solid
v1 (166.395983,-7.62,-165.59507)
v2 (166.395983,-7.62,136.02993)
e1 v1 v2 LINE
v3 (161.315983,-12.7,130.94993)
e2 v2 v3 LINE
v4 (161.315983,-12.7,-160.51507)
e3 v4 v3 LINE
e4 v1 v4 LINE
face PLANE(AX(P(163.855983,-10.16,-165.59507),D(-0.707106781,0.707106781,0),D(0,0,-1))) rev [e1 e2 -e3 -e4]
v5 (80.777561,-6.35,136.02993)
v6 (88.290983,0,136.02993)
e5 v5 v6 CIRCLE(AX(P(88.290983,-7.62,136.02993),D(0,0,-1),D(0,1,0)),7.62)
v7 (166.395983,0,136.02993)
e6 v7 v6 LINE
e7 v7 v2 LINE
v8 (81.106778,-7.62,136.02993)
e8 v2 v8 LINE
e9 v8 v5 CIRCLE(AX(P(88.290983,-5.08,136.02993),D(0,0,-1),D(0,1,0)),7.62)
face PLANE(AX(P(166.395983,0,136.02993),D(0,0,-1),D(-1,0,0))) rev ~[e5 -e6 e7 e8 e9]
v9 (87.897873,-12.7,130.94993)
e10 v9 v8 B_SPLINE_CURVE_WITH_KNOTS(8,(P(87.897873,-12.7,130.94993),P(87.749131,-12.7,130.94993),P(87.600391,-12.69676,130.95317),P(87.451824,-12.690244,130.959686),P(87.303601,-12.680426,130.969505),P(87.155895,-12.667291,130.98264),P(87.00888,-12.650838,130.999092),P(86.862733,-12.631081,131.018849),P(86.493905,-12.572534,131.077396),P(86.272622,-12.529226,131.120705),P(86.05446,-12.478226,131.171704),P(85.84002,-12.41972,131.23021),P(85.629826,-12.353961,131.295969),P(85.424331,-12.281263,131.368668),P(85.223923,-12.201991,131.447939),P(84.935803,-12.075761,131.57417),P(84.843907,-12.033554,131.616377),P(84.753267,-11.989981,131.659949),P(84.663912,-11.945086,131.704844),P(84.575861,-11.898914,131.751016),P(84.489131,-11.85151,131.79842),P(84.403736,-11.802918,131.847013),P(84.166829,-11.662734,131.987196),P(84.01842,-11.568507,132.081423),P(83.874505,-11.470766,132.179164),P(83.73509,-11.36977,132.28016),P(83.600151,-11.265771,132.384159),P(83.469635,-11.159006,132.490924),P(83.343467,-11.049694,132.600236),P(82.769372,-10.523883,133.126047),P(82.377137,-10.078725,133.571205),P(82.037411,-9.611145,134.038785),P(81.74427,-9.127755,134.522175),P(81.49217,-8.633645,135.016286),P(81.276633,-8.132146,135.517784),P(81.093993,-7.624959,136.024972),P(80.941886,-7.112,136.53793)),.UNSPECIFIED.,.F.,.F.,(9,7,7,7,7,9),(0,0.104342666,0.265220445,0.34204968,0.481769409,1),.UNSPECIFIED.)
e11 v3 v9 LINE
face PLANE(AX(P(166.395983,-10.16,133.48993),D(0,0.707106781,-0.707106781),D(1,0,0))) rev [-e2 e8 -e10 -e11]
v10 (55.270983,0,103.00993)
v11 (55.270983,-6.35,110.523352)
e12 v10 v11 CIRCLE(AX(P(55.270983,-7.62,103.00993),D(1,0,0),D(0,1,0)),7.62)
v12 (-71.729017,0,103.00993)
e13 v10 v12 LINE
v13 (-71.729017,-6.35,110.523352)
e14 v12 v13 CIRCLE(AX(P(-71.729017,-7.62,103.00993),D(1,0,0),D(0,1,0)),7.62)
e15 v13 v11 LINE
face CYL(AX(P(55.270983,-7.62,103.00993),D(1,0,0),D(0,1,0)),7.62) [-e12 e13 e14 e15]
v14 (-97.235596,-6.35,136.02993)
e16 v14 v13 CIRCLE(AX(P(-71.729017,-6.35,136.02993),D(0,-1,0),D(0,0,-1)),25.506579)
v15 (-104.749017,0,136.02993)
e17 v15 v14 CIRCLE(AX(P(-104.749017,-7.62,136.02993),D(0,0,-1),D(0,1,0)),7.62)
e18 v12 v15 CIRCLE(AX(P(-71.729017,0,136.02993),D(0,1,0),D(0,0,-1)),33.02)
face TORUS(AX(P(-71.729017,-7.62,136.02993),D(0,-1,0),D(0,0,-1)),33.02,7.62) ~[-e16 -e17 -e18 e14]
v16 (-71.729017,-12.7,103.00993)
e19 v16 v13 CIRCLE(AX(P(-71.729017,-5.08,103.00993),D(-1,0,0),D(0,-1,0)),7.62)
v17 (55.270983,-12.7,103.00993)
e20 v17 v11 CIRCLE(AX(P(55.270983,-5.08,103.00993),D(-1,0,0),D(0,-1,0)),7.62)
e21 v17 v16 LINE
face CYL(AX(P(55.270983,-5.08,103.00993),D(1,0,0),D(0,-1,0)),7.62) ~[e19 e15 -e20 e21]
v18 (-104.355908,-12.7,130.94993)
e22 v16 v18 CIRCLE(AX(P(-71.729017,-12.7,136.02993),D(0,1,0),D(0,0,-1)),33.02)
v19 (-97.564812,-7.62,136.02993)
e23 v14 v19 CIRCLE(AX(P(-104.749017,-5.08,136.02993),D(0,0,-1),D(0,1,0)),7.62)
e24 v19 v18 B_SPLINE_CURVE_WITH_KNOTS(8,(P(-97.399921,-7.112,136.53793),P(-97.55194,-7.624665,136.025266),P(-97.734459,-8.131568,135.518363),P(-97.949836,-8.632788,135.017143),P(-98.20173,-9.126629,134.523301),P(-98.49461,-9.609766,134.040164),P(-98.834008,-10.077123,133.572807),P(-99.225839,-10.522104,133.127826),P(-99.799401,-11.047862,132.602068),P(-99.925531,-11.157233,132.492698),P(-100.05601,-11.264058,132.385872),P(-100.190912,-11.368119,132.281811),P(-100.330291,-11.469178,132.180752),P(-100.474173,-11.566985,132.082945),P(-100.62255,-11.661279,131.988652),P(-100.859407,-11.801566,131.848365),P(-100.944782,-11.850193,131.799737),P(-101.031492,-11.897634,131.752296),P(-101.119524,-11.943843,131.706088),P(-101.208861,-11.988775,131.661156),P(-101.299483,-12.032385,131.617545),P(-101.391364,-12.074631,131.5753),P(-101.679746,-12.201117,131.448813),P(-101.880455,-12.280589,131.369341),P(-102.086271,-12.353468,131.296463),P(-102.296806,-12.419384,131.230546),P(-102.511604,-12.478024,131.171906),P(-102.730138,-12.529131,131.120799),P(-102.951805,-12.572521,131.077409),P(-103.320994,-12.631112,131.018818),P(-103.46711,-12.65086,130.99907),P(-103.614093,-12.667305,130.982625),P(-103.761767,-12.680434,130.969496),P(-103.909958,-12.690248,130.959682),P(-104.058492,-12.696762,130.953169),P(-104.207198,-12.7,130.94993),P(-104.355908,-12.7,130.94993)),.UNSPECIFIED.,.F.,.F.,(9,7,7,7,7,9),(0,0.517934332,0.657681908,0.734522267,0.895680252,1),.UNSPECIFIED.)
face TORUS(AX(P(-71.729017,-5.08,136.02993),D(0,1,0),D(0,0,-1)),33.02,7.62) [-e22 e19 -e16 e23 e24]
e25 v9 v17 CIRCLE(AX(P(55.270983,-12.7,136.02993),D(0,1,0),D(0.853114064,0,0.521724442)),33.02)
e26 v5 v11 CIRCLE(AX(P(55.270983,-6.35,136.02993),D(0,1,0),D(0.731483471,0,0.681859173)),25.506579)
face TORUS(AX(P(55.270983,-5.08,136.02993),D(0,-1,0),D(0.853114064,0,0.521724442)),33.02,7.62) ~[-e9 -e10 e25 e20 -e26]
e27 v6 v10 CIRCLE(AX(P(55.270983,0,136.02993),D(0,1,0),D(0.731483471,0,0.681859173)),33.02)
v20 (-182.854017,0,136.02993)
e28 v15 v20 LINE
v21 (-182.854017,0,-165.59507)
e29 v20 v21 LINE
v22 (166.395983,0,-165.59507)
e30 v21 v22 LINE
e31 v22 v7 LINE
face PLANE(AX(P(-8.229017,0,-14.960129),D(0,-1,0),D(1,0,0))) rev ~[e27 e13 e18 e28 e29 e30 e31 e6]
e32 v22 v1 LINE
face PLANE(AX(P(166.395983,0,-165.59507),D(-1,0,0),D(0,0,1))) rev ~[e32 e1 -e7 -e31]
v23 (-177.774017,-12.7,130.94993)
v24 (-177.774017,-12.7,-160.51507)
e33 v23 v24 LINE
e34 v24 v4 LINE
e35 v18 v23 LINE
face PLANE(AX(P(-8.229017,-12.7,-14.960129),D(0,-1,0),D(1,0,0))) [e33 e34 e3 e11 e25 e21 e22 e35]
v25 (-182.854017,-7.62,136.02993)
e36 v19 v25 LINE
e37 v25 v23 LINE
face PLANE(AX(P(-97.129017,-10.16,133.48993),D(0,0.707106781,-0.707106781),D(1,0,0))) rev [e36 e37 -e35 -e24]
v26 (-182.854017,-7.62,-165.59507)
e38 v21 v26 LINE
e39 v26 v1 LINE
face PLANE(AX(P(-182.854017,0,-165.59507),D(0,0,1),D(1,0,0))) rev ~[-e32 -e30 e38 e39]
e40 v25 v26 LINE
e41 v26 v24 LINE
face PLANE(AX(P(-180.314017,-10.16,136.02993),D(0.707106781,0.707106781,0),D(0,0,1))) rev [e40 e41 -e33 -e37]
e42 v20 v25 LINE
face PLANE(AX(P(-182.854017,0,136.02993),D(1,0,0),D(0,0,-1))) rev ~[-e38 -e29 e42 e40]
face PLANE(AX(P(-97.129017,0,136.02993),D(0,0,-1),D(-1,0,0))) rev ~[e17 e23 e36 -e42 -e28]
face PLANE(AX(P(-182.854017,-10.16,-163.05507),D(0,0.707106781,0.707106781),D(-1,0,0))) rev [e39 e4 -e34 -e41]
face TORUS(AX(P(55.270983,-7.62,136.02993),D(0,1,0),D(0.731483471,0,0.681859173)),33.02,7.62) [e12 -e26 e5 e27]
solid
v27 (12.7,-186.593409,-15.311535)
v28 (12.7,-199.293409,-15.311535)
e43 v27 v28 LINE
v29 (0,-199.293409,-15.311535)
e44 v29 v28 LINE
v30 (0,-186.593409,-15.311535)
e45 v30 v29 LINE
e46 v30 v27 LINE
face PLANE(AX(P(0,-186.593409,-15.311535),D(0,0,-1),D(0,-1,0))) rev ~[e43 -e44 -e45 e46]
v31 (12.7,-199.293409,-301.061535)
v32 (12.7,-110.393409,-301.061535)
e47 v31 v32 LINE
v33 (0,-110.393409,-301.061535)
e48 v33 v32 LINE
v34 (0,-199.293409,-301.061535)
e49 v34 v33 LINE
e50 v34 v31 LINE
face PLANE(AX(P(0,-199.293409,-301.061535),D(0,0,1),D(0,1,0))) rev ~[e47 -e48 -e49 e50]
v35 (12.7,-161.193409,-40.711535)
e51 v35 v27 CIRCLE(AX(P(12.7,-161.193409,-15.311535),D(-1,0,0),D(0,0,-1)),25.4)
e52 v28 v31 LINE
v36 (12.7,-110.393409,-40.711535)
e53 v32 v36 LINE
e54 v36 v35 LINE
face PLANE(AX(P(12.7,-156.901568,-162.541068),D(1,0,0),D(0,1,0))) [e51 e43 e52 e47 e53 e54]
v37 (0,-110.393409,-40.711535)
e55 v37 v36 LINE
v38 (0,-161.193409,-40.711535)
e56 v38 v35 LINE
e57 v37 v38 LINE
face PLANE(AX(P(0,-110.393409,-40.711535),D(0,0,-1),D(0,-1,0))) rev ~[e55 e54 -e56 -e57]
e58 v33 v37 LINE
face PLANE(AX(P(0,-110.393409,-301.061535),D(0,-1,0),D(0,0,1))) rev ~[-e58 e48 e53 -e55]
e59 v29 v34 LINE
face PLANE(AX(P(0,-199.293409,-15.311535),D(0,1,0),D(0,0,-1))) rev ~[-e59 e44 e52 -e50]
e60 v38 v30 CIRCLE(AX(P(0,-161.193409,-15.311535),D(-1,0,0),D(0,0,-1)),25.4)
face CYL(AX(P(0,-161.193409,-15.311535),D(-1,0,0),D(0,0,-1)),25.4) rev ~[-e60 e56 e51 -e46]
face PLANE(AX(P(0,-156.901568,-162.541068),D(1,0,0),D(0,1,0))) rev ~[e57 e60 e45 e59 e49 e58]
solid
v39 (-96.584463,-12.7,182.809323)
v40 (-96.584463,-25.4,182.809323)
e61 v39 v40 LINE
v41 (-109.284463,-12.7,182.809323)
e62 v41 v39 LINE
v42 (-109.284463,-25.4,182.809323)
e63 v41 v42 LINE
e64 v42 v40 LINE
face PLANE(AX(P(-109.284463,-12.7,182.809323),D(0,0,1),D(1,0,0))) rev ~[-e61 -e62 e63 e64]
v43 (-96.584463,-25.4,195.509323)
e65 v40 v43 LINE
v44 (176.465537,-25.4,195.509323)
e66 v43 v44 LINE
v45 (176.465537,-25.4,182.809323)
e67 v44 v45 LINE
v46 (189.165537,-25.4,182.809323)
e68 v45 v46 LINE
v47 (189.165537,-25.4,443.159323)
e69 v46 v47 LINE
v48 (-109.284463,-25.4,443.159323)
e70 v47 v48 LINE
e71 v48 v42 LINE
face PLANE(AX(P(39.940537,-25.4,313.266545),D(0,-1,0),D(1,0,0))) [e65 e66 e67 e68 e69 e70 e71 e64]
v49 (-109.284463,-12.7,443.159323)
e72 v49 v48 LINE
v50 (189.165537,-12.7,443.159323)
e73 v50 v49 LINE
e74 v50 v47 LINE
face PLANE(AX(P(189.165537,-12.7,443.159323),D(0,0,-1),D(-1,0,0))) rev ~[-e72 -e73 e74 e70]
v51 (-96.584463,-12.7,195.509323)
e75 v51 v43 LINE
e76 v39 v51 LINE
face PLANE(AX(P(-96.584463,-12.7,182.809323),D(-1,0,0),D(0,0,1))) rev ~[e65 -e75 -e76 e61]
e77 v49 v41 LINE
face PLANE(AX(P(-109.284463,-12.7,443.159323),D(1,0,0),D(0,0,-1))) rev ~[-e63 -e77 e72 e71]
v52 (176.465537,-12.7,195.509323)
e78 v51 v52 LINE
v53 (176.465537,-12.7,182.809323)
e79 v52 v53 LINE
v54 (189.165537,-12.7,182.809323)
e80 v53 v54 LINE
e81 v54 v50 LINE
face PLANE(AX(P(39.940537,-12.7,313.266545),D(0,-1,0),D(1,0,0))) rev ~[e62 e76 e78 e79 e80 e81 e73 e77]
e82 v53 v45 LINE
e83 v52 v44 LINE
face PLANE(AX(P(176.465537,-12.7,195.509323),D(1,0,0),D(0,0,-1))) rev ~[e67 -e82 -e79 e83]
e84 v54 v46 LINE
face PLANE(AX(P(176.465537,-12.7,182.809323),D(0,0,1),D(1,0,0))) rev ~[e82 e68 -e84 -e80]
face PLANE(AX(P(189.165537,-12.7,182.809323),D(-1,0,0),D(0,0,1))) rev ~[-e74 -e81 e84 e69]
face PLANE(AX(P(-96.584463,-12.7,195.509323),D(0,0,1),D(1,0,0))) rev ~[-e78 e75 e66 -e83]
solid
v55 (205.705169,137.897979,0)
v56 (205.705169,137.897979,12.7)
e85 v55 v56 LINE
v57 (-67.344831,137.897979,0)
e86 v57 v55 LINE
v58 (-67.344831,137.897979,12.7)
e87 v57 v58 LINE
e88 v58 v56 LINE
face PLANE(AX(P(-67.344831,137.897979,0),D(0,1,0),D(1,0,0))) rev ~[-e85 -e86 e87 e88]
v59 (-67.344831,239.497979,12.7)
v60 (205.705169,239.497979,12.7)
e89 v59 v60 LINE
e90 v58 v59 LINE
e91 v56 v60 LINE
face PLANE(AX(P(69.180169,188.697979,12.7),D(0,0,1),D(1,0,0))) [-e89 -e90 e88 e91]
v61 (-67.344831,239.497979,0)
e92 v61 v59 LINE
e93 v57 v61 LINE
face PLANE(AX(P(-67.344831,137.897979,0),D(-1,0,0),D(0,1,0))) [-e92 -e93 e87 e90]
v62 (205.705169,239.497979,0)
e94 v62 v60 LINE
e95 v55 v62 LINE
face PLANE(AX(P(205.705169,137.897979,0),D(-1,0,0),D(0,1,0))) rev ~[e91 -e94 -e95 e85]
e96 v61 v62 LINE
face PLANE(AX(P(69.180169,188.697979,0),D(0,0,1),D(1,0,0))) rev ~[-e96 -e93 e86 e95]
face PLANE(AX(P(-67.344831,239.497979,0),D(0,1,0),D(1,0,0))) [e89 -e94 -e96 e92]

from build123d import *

# Parameters (mm, degrees)
F1_DEPTH     = 12.7
F2_SIZE      = 5.08
F3_T3_DEPTH  = 127
F3_T6_DEPTH  = 127
F3_T9_ANGLE  = 132.9890967712
F3_T12_ANGLE = 132.9890967712
F3_T15_ANGLE = 121.447994897
F3_T18_ANGLE = 121.447994897
F4_W         = 273.05
F4_H         = 101.6
F5_DEPTH     = 12.7
F7_DEPTH     = 12.7
F9_DEPTH     = 12.7


# Not quite as in the source:
# - a fillet or chamfer that OpenCascade refuses, or shapes differently, is made with other operations: its cross-section is extruded or revolved along the edge and cut away or added


with BuildPart() as f1:
    # F0 (on Front) → F1 (new body)
    with BuildSketch(Plane.XZ):
        with BuildLine():
            Line((-97.1290172577, 136.0299303359), (-182.8540172577, 136.0299303359))
            Line((-182.8540172577, 136.0299303359), (-182.8540172577, -165.5950696641))
            Line((-182.8540172577, -165.5950696641), (166.3959827423, -165.5950696641))
            Line((166.3959827423, -165.5950696641), (166.3959827423, 136.0299303359))
            Line((166.3959827423, 136.0299303359), (80.6709827423, 136.0299303359))
            ThreePointArc((80.6709827423, 136.0299303359), (73.2314949844, 118.0694180937), (55.2709827423, 110.6299303359))
            Line((55.2709827423, 110.6299303359), (-71.7290172577, 110.6299303359))
            ThreePointArc((-71.7290172577, 110.6299303359), (-89.6895294998, 118.0694180937), (-97.1290172577, 136.0299303359))
        make_face()
    extrude(amount=F1_DEPTH)

    # F2
    f2_edges = [f1.edges().sort_by_distance(p)[0] for p in [
        (-8.229017, -12.7, -165.59507),
        (166.395983, -12.7, -14.78257),
        (-182.854017, -12.7, -14.78257),
        (-139.991517, -12.7, 136.02993),
        (123.533483, -12.7, 136.02993),
    ]]
    chamfer(f2_edges, length=F2_SIZE)

    # F3: fillet of radius 7.62 on 2 edges, made by hand


with BuildPart() as f3_tool1:
    # F3_s2 → F3_t3 (new body)
    with BuildSketch(Plane.YZ.offset(55.2709827423)):
        with BuildLine():
            ThreePointArc((-12.7, 103.0099303359), (-10.4681536726, 108.3980840085), (-5.08, 110.6299303359))
            Line((-5.08, 110.6299303359), (-12.7, 110.6299303359))
            Line((-12.7, 110.6299303359), (-12.7, 103.0099303359))
        make_face()
    extrude(amount=-F3_T3_DEPTH)


with BuildPart() as f3_tool4:
    # F3_s5 → F3_t6 (new body)
    with BuildSketch(Plane.YZ.offset(55.2709827423)):
        with BuildLine():
            ThreePointArc((0, 103.0099303359), (-2.2318463274, 108.3980840085), (-7.62, 110.6299303359))
            Line((-7.62, 110.6299303359), (0, 110.6299303359))
            Line((0, 110.6299303359), (0, 103.0099303359))
        make_face()
    extrude(amount=-F3_T6_DEPTH)


with BuildPart() as f3_tool7:
    # F3_s8 → F3_t9 (revolve)
    with BuildSketch(Plane(origin=(-42.1502287044, 0, 45.217835005), x_dir=(0, 1, 0), z_dir=(-0.6818591731, 0, 0.7314834708))):
        with BuildLine():
            ThreePointArc((0, -166.2030661087), (-2.2318463274, -160.8149124361), (-7.62, -158.5830661087))
            Line((-7.62, -158.5830661087), (0, -158.5830661087))
            Line((0, -158.5830661087), (0, -166.2030661087))
        make_face()
    revolve(axis=Axis((55.2709827423, 0, 136.0299303359), (0, 1, 0)), revolution_arc=F3_T9_ANGLE)


with BuildPart() as f3_tool10:
    # F3_s11 → F3_t12 (revolve)
    with BuildSketch(Plane.YZ.offset(-71.7290172577)):
        with BuildLine():
            ThreePointArc((-7.62, 110.6299303359), (-2.2318463274, 108.3980840085), (0, 103.0099303359))
            Line((0, 103.0099303359), (0, 110.6299303359))
            Line((0, 110.6299303359), (-7.62, 110.6299303359))
        make_face()
    revolve(axis=Axis((-71.7290172577, 0, 136.0299303359), (0, 1, 0)), revolution_arc=F3_T12_ANGLE)


with BuildPart() as f3_tool13:
    # F3_s14 → F3_t15 (revolve)
    with BuildSketch(Plane(origin=(-45.5010619878, 0, 74.4024868236), x_dir=(0, 1, 0), z_dir=(-0.521724442, 0, 0.8531140643))):
        with BuildLine():
            ThreePointArc((-12.7, -151.1425922207), (-10.4681536726, -145.7544385481), (-5.08, -143.5225922207))
            Line((-5.08, -143.5225922207), (-12.7, -143.5225922207))
            Line((-12.7, -143.5225922207), (-12.7, -151.1425922207))
        make_face()
    revolve(axis=Axis((55.2709827423, -12.7, 136.0299303359), (0, 1, 0)), revolution_arc=F3_T15_ANGLE)


with BuildPart() as f3_tool16:
    # F3_s17 → F3_t18 (revolve)
    with BuildSketch(Plane.YZ.offset(-71.7290172577)):
        with BuildLine():
            ThreePointArc((-5.08, 110.6299303359), (-10.4681536726, 108.3980840085), (-12.7, 103.0099303359))
            Line((-12.7, 103.0099303359), (-12.7, 110.6299303359))
            Line((-12.7, 110.6299303359), (-5.08, 110.6299303359))
        make_face()
    revolve(axis=Axis((-71.7290172577, -12.7, 136.0299303359), (0, 1, 0)), revolution_arc=F3_T18_ANGLE)


with BuildPart() as f1_1:
    add(f1.part)

    # F3_t19: cut F3_tool1, F3_tool4, F3_tool7, F3_tool10, F3_tool13, F3_tool16
    add([f3_tool1.part, f3_tool4.part, f3_tool7.part, f3_tool10.part, f3_tool13.part, f3_tool16.part], mode=Mode.SUBTRACT)


with BuildPart() as f5:
    # F4 (on Top) → F5 (new body)
    with BuildSketch(Plane.XY):
        with Locations((69.1801686266, 188.6979788542)):
            Rectangle(F4_W, F4_H)
    extrude(amount=F5_DEPTH)


with BuildPart() as f7:
    # F6 (on Right) → F7 (new body)
    with BuildSketch(Plane.YZ):
        with BuildLine():
            ThreePointArc((-161.1934086972, -40.7115346551), (-179.1539209393, -33.2720468972), (-186.5934086972, -15.3115346551))
            Line((-186.5934086972, -15.3115346551), (-199.2934086972, -15.3115346551))
            Line((-199.2934086972, -15.3115346551), (-199.2934086972, -301.0615346551))
            Line((-199.2934086972, -301.0615346551), (-110.3934086972, -301.0615346551))
            Line((-110.3934086972, -301.0615346551), (-110.3934086972, -40.7115346551))
            Line((-110.3934086972, -40.7115346551), (-161.1934086972, -40.7115346551))
        make_face()
    extrude(amount=F7_DEPTH)


with BuildPart() as f9:
    # F8 (on face) → F9 (new body)
    with BuildSketch(Plane.XZ.offset(12.7)):
        Polygon((189.165537107, 443.1593230724), (-109.284462893, 443.1593230724), (-109.284462893, 195.5093230724), (-109.284462893, 182.8093230724), (-96.584462893, 182.8093230724), (-96.584462893, 195.5093230724), (176.465537107, 195.5093230724), (176.465537107, 182.8093230724), (189.165537107, 182.8093230724), (189.165537107, 195.5093230724), align=None)
    extrude(amount=F9_DEPTH)


solid = Compound([f1_1.part, f5.part, f7.part, f9.part])
